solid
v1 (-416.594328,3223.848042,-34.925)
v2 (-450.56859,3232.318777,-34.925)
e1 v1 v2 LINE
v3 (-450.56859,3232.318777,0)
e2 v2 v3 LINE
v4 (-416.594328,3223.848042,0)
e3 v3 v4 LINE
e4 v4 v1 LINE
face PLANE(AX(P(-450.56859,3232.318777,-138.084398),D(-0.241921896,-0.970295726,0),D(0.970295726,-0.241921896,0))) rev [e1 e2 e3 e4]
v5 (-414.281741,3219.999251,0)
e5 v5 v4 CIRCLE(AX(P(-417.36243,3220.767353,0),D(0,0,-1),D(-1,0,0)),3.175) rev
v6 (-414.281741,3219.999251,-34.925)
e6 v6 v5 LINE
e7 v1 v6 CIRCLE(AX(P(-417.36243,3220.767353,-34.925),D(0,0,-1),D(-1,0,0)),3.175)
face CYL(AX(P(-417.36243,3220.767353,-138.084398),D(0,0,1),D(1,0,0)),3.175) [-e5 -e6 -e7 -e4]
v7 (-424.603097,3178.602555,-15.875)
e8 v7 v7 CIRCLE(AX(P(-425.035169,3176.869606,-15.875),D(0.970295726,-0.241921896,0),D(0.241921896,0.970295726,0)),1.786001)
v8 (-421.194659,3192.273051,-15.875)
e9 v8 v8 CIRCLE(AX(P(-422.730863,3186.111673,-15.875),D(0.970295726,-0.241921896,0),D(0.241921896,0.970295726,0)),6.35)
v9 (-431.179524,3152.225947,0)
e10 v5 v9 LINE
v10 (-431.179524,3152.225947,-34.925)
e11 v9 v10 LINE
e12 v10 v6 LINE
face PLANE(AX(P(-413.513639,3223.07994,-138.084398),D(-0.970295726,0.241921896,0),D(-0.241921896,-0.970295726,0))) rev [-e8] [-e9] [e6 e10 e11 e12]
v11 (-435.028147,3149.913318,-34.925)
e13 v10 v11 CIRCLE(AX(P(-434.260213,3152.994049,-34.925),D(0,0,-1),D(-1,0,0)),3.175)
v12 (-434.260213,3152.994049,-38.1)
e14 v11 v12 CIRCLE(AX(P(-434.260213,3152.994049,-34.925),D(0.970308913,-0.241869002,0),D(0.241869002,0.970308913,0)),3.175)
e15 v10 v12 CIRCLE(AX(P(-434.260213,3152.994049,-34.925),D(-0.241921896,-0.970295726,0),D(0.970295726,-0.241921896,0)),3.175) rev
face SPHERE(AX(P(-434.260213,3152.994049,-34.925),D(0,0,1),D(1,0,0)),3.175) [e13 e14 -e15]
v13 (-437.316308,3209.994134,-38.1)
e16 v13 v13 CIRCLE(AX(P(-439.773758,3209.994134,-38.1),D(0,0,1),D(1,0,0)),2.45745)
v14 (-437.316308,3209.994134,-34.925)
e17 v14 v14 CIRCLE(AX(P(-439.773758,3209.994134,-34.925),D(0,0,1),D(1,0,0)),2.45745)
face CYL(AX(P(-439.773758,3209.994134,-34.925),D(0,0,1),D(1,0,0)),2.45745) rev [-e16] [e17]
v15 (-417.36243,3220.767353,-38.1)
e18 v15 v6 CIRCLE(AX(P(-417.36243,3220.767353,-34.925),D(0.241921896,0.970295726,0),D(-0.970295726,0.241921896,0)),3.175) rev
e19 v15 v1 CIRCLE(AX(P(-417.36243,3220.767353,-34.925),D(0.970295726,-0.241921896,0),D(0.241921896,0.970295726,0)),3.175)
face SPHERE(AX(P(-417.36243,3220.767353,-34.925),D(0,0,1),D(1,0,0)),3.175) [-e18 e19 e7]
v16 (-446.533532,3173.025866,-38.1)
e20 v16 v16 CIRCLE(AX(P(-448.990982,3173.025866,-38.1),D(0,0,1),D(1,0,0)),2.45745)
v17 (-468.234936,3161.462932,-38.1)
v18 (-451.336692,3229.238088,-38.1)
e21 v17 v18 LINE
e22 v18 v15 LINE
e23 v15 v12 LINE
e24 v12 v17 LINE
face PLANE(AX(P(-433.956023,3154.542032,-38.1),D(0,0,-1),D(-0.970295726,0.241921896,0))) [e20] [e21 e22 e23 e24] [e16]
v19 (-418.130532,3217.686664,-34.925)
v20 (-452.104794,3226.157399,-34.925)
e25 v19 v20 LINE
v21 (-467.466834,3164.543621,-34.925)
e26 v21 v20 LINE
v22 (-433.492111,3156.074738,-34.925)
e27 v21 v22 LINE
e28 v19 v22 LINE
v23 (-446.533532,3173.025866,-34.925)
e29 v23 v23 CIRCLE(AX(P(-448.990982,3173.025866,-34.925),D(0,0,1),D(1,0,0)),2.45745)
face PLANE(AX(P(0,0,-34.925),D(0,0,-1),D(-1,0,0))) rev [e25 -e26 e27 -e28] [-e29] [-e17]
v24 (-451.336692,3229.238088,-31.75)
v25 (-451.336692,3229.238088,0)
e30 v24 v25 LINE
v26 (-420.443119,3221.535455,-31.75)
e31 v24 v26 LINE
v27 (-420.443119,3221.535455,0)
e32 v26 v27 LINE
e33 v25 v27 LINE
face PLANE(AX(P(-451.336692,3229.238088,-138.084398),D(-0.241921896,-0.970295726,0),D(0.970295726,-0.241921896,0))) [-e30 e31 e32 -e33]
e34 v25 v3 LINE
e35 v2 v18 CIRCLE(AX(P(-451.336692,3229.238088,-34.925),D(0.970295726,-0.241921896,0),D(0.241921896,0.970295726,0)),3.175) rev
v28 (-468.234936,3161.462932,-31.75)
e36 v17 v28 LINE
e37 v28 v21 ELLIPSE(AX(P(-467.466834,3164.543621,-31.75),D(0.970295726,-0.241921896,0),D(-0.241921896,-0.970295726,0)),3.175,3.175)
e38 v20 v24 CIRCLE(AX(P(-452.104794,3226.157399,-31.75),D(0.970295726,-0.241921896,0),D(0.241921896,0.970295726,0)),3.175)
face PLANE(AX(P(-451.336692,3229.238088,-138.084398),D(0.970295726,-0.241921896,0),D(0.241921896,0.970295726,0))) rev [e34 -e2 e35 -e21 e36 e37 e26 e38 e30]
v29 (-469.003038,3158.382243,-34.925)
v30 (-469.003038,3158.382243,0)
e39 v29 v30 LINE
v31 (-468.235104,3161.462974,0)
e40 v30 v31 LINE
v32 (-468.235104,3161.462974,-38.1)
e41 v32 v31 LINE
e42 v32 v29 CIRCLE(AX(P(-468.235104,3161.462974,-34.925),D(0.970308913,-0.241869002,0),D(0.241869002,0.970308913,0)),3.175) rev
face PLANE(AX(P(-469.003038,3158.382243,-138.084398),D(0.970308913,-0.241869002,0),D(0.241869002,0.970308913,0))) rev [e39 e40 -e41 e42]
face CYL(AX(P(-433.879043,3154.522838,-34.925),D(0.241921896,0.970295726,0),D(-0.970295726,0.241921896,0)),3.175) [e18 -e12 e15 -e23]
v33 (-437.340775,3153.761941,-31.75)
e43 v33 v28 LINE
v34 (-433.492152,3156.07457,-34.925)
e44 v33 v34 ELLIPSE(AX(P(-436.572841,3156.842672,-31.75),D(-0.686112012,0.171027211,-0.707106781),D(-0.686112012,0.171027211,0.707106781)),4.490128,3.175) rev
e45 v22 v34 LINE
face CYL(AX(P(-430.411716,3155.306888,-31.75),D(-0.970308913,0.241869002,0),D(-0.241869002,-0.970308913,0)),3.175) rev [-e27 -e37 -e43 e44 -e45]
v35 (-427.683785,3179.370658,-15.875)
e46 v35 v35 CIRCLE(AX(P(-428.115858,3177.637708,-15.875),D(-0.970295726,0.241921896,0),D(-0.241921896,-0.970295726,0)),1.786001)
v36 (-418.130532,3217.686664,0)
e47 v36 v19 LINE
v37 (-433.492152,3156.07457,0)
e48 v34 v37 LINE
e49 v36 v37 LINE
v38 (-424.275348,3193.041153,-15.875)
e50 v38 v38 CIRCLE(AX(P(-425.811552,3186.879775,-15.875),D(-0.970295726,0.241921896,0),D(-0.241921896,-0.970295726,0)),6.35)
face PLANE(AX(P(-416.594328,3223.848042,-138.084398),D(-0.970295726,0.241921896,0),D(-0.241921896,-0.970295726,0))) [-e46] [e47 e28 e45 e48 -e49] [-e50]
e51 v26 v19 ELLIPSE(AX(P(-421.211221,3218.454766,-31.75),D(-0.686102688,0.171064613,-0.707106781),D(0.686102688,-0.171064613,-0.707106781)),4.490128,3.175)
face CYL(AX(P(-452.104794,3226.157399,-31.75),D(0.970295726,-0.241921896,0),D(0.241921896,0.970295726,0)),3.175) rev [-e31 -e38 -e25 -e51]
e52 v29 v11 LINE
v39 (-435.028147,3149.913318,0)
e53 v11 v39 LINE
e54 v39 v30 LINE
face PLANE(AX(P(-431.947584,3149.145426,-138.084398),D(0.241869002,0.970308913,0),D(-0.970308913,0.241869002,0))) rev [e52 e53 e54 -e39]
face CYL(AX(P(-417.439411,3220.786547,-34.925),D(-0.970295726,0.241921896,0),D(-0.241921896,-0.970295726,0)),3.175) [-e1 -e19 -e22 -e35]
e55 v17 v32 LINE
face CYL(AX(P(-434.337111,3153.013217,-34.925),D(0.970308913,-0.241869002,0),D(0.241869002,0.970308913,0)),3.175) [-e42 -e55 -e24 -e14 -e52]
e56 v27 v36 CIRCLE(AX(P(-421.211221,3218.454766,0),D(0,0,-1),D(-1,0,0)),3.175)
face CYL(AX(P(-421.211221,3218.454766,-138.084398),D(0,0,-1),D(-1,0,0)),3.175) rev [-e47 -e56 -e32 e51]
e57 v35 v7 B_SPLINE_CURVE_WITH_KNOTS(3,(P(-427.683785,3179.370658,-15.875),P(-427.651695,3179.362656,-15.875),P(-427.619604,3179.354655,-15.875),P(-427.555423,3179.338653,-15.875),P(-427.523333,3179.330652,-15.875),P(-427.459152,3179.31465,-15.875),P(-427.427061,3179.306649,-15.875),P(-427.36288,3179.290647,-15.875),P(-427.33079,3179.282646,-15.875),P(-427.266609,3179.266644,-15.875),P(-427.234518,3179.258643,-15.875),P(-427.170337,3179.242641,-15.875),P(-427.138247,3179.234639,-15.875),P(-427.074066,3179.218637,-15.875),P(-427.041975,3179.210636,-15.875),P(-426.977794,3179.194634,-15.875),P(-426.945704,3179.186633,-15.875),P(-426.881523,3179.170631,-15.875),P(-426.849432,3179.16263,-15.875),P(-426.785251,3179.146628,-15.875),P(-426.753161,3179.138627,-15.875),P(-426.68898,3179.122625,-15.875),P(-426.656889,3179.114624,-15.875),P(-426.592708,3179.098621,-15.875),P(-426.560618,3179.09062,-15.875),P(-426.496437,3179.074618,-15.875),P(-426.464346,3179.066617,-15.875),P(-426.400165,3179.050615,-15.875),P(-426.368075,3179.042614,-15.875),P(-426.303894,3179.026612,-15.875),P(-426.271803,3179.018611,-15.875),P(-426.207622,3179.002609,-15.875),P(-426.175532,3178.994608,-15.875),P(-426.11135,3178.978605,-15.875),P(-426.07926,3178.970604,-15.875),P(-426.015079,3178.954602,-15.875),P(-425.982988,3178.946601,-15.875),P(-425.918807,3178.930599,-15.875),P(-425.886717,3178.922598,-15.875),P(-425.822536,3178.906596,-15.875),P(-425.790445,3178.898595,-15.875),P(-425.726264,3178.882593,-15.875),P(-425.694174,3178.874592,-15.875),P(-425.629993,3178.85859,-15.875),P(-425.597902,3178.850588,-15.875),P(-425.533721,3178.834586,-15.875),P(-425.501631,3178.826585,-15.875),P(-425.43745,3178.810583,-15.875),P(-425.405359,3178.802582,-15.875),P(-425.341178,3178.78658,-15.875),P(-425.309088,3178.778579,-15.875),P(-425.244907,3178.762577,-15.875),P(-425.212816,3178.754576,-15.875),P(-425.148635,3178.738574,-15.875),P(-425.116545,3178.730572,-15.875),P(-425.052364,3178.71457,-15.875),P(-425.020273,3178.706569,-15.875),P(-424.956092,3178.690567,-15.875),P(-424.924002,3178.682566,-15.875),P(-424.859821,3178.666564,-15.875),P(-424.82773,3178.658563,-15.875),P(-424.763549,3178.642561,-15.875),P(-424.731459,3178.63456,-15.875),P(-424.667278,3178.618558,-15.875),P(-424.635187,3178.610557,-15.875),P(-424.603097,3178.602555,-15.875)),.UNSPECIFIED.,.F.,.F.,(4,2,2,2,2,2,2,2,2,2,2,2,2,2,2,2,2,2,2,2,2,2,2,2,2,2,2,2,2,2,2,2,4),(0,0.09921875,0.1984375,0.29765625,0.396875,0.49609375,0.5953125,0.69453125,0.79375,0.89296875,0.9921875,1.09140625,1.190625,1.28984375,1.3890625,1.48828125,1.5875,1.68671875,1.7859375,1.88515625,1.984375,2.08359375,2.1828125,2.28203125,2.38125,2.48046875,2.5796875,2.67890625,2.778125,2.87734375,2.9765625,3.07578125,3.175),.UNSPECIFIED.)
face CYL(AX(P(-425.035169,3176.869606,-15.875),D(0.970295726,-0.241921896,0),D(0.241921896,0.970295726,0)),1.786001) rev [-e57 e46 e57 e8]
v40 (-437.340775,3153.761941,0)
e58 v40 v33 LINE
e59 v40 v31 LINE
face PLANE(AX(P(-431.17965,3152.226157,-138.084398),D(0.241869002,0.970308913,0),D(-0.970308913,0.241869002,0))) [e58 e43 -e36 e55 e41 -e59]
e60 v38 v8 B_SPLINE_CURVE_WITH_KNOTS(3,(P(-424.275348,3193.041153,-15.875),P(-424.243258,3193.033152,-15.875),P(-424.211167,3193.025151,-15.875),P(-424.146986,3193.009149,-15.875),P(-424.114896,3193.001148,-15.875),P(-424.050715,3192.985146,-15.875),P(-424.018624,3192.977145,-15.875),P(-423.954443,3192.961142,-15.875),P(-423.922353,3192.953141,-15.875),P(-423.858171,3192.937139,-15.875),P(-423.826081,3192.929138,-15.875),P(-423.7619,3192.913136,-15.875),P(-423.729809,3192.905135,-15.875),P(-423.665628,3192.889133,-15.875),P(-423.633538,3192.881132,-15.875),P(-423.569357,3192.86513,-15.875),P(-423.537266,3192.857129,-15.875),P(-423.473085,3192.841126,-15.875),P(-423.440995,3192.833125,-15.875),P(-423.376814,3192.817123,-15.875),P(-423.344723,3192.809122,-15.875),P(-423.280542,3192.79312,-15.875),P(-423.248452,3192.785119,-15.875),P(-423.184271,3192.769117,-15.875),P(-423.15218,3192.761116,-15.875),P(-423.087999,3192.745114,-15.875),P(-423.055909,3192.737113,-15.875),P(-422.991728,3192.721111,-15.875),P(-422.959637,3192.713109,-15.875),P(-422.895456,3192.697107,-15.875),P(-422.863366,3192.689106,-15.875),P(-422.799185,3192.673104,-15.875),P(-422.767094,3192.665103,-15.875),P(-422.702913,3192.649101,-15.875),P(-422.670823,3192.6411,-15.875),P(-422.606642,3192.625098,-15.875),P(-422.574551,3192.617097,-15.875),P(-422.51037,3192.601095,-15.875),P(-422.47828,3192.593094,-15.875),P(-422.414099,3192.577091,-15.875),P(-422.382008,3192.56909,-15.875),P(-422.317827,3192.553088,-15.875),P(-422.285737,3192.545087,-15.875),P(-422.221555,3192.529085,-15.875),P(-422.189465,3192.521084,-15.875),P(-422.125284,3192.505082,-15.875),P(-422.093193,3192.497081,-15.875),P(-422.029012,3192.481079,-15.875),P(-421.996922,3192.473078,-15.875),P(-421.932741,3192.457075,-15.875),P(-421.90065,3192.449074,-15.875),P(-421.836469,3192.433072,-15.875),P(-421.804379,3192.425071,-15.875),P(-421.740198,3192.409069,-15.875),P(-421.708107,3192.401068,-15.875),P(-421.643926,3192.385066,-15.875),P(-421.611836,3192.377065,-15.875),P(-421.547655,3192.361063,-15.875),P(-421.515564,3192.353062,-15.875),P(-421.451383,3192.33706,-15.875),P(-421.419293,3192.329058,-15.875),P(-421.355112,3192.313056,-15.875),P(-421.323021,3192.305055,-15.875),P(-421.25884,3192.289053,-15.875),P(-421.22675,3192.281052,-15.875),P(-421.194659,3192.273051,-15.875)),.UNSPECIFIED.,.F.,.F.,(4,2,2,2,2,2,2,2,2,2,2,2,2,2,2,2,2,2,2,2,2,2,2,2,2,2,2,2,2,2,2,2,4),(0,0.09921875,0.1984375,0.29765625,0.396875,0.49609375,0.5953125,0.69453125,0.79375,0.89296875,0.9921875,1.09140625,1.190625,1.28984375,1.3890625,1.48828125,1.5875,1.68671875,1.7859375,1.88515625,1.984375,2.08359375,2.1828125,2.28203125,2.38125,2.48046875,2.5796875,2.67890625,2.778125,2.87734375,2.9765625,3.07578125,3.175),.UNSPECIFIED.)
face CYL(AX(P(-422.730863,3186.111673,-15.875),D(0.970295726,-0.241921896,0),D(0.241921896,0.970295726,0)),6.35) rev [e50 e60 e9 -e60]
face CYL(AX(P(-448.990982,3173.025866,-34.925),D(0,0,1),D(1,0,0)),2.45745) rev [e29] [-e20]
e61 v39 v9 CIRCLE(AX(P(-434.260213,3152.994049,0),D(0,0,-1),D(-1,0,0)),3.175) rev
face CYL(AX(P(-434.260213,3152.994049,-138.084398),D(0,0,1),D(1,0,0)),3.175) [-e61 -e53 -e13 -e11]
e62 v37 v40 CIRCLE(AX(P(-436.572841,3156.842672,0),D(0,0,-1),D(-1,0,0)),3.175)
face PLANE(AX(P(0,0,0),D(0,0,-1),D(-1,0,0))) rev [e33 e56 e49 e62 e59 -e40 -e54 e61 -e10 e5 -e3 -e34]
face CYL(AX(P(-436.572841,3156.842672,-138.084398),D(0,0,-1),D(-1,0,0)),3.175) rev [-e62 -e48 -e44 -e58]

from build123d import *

# Parameters (mm, degrees)
EXTRUDE_THIN1_DEPTH             = 38.1
BOSS_EXTRUDE1_DEPTH             = 3.175
F_8_CLEARANCE_HOLE1_D           = 4.9149
FILLET1_R                       = 3.175
F_1_2_0_5_DIAMETER_HOLE1_D      = 12.7
F_9_64_0_14063_DIAMETER_HOLE1_D = 3.572002


with BuildPart() as part:
    # Sketch1 → Extrude-Thin1 (new body)
    with BuildSketch(Plane.XY):
        Polygon((-450.568590055, 3232.318777264), (-413.513639003, 3223.079940323), (-431.947583815, 3149.145425944), (-469.0030385, 3158.382242922), (-468.235104419, 3161.462973719), (-434.260212597, 3152.994048962), (-417.362429953, 3220.76735341), (-451.336692074, 3229.238088333), align=None)
    extrude(amount=-EXTRUDE_THIN1_DEPTH)

    # Sketch2 → Boss-Extrude1 (add)
    with BuildSketch(Plane(origin=(0, 0, -38.1), x_dir=(-1, 0, 0), z_dir=(0, 0, -1))):
        Polygon((413.513639003, 3223.079940323), (431.947583815, 3149.145425944), (469.0030385, 3158.382242922), (450.568590055, 3232.318777264), align=None)
    extrude(amount=-BOSS_EXTRUDE1_DEPTH)

    # #8 Clearance Hole1 (through all)
    with Locations(Plane.XY.offset(-34.925)):
        with Locations((-439.773757512, 3209.994133586), (-448.990981734, 3173.025866414)):
            Hole(F_8_CLEARANCE_HOLE1_D / 2)

    # Fillet1
    fillet1_edges = [part.edges().sort_by_distance(p)[0] for p in [
        (-413.513639003, 3223.079940323, -19.05),
        (-417.362429953, 3220.76735341, -17.4625),
        (-434.349561013, 3225.002720872, -34.925),
        (-451.247574539, 3157.228490409, -34.925),
        (-434.260212597, 3152.994048962, -17.4625),
        (-450.475311157, 3153.763834433, -38.1),
        (-431.947583815, 3149.145425944, -19.05),
        (-432.041114529, 3227.699358793, -38.1),
        (-422.730611409, 3186.112683133, -38.1),
    ]]
    fillet(fillet1_edges, radius=FILLET1_R - 0.0001)  # a hair under: the kernel refuses the full size

    # 1/2 (0.5) Diameter Hole1 (through all)
    with Locations(Plane(origin=(-1145.884443872, 285.70107988, 0), x_dir=(0, 0, -1), z_dir=(0.9702957262759976, -0.24192189559966307, 0))):
        with Locations((15.875, 2989.202688137)):
            Hole(F_1_2_0_5_DIAMETER_HOLE1_D / 2)

    # 9/64 (0.14063) Diameter Hole1 (through all)
    with Locations(Plane(origin=(-1145.884443872, 285.70107988, 0), x_dir=(0, 0, -1), z_dir=(0.9702957262759976, -0.24192189559966307, 0))):
        with Locations((15.875, 2979.677688137)):
            Hole(F_9_64_0_14063_DIAMETER_HOLE1_D / 2)


solid = part.part
